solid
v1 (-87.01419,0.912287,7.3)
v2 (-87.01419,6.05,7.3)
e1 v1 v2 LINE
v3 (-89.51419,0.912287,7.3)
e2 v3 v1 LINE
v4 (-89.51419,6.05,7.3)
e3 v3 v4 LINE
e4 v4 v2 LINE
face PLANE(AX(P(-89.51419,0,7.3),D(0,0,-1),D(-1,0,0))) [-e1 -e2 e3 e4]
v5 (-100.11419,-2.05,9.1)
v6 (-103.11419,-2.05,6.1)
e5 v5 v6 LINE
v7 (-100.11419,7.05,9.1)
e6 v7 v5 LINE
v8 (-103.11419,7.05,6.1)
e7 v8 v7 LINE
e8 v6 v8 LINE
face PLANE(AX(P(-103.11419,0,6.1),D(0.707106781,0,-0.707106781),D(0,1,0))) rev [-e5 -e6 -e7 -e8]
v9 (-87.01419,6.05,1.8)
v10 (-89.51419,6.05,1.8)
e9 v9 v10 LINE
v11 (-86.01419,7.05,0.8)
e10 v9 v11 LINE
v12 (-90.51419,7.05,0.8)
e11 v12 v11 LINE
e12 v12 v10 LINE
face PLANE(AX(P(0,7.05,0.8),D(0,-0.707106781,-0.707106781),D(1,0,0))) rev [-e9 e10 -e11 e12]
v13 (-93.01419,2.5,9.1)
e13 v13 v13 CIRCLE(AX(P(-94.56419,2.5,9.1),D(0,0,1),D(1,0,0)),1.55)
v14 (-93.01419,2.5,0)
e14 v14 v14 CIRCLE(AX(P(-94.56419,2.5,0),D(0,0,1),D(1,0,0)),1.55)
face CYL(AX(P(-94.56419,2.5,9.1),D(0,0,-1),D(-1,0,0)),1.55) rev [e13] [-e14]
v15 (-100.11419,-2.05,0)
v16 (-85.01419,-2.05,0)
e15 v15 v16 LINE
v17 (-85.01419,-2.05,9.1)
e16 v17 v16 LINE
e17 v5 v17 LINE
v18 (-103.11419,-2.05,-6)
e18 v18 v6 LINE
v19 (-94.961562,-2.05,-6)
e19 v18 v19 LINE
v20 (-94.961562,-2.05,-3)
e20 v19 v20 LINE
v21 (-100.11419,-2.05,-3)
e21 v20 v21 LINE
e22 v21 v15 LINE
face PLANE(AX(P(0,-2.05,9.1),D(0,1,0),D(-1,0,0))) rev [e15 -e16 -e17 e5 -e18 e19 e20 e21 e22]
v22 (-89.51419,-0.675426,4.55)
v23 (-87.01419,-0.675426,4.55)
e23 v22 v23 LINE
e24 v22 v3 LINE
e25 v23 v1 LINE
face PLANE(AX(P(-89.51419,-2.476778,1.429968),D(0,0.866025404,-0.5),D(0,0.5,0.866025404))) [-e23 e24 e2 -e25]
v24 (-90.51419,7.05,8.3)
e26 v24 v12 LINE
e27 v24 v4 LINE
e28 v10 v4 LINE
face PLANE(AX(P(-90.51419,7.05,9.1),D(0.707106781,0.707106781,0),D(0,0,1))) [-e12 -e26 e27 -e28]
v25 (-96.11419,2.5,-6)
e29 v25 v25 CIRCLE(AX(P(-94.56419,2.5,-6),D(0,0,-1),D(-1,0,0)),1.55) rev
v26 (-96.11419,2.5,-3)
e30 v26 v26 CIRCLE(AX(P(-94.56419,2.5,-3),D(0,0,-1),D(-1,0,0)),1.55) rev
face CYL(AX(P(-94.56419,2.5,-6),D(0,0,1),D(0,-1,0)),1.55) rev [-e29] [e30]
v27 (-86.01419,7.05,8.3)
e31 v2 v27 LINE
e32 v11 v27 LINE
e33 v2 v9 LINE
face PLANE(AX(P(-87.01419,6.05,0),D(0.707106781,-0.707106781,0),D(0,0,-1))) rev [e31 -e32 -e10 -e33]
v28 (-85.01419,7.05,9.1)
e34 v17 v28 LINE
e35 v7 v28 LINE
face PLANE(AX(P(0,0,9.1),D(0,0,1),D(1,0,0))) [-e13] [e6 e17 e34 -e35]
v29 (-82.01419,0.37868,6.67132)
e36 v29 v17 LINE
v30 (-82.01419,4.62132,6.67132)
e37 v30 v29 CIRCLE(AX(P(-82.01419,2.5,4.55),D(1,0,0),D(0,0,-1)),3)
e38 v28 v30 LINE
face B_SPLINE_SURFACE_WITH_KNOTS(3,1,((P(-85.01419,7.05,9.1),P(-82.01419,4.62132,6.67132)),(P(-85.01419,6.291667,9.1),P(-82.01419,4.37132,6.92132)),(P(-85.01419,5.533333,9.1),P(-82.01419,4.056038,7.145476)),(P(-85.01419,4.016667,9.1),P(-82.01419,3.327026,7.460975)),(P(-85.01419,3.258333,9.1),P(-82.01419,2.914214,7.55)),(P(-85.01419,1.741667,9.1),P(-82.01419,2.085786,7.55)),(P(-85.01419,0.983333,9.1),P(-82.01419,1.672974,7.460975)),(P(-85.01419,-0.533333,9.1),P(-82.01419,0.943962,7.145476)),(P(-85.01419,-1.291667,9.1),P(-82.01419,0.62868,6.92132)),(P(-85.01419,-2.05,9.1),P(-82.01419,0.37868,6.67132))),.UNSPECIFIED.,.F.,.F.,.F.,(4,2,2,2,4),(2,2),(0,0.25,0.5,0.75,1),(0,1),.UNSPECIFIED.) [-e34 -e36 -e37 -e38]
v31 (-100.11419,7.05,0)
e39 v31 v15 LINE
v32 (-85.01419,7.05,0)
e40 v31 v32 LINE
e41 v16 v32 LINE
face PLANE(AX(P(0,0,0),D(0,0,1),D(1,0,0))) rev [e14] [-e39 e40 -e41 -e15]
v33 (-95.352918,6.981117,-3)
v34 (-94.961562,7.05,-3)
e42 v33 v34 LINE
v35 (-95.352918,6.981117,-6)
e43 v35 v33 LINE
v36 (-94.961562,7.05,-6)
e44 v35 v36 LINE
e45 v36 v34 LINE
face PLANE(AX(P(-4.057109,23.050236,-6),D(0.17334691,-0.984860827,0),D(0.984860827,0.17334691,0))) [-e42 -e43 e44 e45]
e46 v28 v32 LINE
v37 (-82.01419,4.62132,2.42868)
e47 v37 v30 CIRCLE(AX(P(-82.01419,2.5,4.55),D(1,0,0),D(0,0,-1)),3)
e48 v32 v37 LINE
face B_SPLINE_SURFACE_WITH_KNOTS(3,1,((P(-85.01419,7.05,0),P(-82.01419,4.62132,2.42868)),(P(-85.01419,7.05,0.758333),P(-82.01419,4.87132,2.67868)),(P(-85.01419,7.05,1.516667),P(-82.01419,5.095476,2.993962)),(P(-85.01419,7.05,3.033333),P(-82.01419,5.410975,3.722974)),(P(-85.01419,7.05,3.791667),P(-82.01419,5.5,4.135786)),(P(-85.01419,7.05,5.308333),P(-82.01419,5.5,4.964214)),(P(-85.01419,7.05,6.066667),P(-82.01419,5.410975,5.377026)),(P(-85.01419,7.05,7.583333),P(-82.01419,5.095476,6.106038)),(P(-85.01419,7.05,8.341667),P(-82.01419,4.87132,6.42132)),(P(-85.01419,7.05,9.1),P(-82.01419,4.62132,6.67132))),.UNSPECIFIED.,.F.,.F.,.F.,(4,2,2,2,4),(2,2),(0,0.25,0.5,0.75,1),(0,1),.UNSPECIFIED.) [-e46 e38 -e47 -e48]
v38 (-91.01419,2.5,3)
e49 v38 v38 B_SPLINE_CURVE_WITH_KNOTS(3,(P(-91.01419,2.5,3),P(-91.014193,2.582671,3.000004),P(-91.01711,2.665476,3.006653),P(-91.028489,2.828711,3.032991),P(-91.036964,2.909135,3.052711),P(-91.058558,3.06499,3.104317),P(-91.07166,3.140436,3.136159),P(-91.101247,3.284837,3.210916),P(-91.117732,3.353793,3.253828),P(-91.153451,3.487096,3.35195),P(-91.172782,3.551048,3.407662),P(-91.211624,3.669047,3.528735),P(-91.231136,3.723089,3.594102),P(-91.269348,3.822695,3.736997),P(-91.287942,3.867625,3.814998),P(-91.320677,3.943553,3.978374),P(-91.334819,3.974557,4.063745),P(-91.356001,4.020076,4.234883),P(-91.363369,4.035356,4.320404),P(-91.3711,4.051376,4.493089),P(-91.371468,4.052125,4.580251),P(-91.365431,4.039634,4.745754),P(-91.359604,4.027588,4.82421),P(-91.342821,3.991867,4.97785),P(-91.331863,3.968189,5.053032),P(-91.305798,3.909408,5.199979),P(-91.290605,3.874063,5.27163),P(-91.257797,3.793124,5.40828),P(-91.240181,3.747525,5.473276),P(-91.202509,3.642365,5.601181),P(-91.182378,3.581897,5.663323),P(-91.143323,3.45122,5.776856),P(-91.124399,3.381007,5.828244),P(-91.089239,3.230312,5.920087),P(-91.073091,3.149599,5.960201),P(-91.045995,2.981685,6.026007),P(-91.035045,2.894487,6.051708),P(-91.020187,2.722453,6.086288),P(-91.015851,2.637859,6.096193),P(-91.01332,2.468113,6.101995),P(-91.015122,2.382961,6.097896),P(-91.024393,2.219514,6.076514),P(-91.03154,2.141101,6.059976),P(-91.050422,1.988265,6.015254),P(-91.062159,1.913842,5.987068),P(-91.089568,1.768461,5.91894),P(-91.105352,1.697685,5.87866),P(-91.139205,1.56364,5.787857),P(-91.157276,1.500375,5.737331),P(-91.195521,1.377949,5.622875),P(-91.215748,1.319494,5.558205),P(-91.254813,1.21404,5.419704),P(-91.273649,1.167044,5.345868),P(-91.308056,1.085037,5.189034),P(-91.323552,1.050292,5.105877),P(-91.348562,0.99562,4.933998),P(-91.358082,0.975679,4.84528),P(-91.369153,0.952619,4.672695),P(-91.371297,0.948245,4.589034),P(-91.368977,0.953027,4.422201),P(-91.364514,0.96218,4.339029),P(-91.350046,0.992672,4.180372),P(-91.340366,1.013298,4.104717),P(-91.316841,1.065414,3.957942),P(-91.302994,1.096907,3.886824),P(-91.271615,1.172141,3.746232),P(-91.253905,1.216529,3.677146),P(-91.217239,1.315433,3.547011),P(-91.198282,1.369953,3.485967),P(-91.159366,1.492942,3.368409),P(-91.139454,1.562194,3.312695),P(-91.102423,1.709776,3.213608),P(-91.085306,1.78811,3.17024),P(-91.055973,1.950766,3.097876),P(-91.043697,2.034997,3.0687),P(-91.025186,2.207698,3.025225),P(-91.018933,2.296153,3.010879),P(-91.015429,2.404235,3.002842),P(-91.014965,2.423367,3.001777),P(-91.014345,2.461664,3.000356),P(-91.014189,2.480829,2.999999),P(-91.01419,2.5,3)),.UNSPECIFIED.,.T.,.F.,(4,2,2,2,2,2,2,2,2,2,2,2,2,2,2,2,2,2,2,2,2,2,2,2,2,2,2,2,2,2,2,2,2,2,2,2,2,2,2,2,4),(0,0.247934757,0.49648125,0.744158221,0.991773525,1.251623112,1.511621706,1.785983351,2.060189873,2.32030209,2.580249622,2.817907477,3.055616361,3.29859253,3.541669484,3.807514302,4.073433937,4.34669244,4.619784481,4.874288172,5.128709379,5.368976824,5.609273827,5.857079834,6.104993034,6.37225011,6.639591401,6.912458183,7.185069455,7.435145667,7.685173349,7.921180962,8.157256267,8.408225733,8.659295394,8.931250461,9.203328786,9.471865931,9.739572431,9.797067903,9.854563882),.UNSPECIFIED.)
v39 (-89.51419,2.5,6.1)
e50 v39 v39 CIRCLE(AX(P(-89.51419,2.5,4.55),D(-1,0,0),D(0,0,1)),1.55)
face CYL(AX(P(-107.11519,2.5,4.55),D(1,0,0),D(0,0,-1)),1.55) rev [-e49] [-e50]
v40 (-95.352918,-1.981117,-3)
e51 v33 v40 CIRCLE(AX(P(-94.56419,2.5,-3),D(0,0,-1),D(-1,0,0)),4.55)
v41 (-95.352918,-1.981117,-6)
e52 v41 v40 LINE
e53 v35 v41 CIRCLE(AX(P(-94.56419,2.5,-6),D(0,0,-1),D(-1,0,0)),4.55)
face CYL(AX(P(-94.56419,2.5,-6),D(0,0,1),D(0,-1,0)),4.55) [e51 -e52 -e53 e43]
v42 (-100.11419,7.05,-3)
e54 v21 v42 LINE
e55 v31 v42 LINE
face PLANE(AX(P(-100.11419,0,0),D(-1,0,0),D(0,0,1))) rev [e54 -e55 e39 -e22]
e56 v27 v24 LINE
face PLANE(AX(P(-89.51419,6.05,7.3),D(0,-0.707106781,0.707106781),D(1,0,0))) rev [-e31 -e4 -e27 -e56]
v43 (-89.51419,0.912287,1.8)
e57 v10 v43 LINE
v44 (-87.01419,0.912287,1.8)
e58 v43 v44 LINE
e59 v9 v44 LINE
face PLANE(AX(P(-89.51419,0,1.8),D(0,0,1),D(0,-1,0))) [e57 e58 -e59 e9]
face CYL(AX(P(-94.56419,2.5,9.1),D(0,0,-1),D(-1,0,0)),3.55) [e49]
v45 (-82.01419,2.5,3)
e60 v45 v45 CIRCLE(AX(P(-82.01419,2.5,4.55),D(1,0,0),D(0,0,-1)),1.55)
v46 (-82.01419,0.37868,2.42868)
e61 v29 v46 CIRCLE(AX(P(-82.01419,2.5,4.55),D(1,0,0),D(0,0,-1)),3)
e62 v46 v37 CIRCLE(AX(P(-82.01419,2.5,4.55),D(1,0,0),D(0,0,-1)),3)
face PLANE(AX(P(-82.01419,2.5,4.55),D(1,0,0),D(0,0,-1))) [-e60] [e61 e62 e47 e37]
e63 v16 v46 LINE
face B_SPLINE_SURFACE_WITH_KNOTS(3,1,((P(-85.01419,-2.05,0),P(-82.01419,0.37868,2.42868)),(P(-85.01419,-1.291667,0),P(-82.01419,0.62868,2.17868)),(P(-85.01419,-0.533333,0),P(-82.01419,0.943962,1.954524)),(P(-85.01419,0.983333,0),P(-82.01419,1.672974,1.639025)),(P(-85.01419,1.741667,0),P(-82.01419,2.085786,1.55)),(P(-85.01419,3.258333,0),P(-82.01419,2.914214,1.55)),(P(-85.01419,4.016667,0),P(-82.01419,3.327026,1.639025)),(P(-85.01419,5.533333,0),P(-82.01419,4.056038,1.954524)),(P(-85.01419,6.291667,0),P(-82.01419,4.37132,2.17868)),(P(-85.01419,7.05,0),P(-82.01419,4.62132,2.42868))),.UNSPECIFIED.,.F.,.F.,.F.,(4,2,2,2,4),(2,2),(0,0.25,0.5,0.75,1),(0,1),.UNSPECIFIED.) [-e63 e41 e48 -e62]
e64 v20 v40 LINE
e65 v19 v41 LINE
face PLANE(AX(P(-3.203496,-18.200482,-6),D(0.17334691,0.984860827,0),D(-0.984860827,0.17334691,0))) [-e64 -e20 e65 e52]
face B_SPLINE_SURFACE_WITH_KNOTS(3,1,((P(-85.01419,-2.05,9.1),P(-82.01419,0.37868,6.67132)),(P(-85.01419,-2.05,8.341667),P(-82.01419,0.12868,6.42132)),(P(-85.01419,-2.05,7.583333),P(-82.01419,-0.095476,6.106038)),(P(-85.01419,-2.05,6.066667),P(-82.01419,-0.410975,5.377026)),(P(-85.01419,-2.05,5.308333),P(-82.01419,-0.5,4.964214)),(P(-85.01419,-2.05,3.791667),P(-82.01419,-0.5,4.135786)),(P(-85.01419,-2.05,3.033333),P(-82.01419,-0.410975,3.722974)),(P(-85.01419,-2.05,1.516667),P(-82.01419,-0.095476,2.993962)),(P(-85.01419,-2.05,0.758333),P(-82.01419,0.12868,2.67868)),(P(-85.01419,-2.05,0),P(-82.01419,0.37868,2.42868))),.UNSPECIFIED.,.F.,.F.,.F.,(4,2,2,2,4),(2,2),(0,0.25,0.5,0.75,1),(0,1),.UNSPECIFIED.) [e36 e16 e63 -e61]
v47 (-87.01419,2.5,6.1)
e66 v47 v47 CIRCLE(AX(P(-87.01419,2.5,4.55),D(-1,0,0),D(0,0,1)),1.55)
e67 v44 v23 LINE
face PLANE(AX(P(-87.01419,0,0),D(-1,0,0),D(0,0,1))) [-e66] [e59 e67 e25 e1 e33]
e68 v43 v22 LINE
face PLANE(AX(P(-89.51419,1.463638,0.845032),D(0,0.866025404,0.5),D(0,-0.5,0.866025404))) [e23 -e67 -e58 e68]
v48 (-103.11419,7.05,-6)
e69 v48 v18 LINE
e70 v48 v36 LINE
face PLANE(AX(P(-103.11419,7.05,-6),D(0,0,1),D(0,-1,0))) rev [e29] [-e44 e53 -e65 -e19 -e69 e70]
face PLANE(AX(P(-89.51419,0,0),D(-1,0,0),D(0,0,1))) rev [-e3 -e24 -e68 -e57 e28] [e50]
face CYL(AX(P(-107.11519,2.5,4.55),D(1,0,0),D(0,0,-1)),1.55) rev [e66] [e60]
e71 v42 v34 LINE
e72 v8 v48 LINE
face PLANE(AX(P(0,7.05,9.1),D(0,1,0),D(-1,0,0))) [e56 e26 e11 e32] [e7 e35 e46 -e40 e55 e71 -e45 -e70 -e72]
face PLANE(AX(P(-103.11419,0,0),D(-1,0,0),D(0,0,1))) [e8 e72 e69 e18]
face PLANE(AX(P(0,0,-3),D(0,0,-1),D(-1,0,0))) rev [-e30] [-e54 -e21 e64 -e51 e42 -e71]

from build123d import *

# Parameters (mm, degrees)
SKETCH1_R               = 4.55
SKETCH1_R_2             = 1.55
BOSS_EXTRUDE1_DEPTH     = 9.1
SKETCH2_R               = 1.55
BOSS_EXTRUDE2_DEPTH     = 3
SKETCH3_W               = 15.1
SKETCH3_H               = 9.1
BOSS_EXTRUDE3_DEPTH     = 3
CUT_EXTRUDE1_REACH      = 26.036
CUT_EXTRUDE1_END_RADIUS = 3.55
SKETCH4_R               = 1.55
SKETCH5_R               = 1.55
CUT_EXTRUDE2_DEPTH      = 2.5
CHAMFER1_SIZE           = 1
CHAMFER2_SIZE           = 3


with BuildPart() as part:
    # Sketch1 → Boss-Extrude1 (new body)
    # profile 1 of 3: a face of its own
    with BuildSketch(Plane.XY):
        with Locations((-94.564189657, 2.5)):
            Circle(SKETCH1_R)
        with Locations((-94.564189657, 2.5)):
            Circle(SKETCH1_R_2, mode=Mode.SUBTRACT)
    # profile 2 of 3: a face of its own
    with BuildSketch(Plane.XY):
        with BuildLine():
            ThreePointArc((-94.564189657, -2.05), (-99.114189657, 2.5), (-94.564189657, 7.05))
            Line((-94.564189657, 7.05), (-100.114189657, 7.05))
            Line((-100.114189657, 7.05), (-100.114189657, -2.05))
            Line((-100.114189657, -2.05), (-94.564189657, -2.05))
        make_face()
    # profile 3 of 3: a face of its own
    with BuildSketch(Plane.XY):
        with BuildLine():
            Line((-85.014189657, 7.05), (-94.564189657, 7.05))
            ThreePointArc((-94.564189657, 7.05), (-91.346853802, 5.717335854), (-90.014189657, 2.5))
            ThreePointArc((-90.014189657, 2.5), (-91.346853802, -0.717335854), (-94.564189657, -2.05))
            Line((-94.564189657, -2.05), (-85.014189657, -2.05))
            Line((-85.014189657, -2.05), (-85.014189657, 7.05))
        make_face()
    extrude(amount=BOSS_EXTRUDE1_DEPTH)



with BuildPart() as body_2:
    # Sketch2 → Boss-Extrude2 (new body)
    # profile 1 of 2: a face of its own
    with BuildSketch(Plane(origin=(0, 0, -3), x_dir=(-1, 0, 0), z_dir=(0, 0, -1))):
        with BuildLine():
            ThreePointArc((95.352918097, 6.981116764), (94.960054991, 7.032746478), (94.564189657, 7.05))
            ThreePointArc((94.564189657, 7.05), (90.014189657, 2.5), (94.564189657, -2.05))
            ThreePointArc((94.564189657, -2.05), (94.960054991, -2.032746478), (95.352918097, -1.981116763))
            ThreePointArc((95.352918097, -1.981116763), (98.049244492, -0.42521671), (99.114189657, 2.5))
            ThreePointArc((99.114189657, 2.5), (98.049244492, 5.42521671), (95.352918097, 6.981116764))
        make_face()
        with Locations(Location((94.564189657, 2.5, 0), (0, 0, 180))):
            Circle(SKETCH2_R, mode=Mode.SUBTRACT)
    # profile 2 of 2: a face of its own
    with BuildSketch(Plane(origin=(0, 0, -3), x_dir=(-1, 0, 0), z_dir=(0, 0, -1))):
        with BuildLine():
            Line((100.114189657, -2.05), (100.114189657, 7.05))
            Line((100.114189657, 7.05), (94.96156182, 7.05))
            Line((94.96156182, 7.05), (95.352918097, 6.981116764))
            ThreePointArc((95.352918097, 6.981116764), (98.049244492, 5.42521671), (99.114189657, 2.5))
            ThreePointArc((99.114189657, 2.5), (98.049244492, -0.42521671), (95.352918097, -1.981116763))
            Line((95.352918097, -1.981116763), (94.96156182, -2.05))
            Line((94.96156182, -2.05), (100.114189657, -2.05))
        make_face()
    extrude(amount=BOSS_EXTRUDE2_DEPTH)


with BuildPart() as part_1:
    add(part.part)

    add(body_2.part)  # Boss-Extrude3 merges body 2
    # Sketch3 → Boss-Extrude3 (add)
    with BuildSketch(Plane.ZY.offset(100.114189657)):
        with Locations((1.55, 2.5)):
            Rectangle(SKETCH3_W, SKETCH3_H)
    extrude(amount=BOSS_EXTRUDE3_DEPTH)

    # Loft1: read off the stored shape, not the designer's step
    # Loft1: loft between two sections, ruled curve by curve
    loft1_from = [
        Edge.make_bspline([(-85.014189657, -2.05, 9.1), (-85.014189657, -2.05, 8.341666667), (-85.014189657, -2.05, 7.583333333), (-85.014189657, -2.05, 6.066666667), (-85.014189657, -2.05, 5.308333333), (-85.014189657, -2.05, 3.791666667), (-85.014189657, -2.05, 3.033333333), (-85.014189657, -2.05, 1.516666667), (-85.014189657, -2.05, 0.758333333), (-85.014189657, -2.05, 0)], [0, 0, 0, 0, 0.25, 0.25, 0.5, 0.5, 0.75, 0.75, 1, 1, 1, 1], 3),
        Edge.make_bspline([(-85.014189657, -2.05, 0), (-85.014189657, -1.291666667, 0), (-85.014189657, -0.533333333, 0), (-85.014189657, 0.983333333, 0), (-85.014189657, 1.741666667, 0), (-85.014189657, 3.258333333, 0), (-85.014189657, 4.016666667, 0), (-85.014189657, 5.533333333, 0), (-85.014189657, 6.291666667, 0), (-85.014189657, 7.05, 0)], [0, 0, 0, 0, 0.25, 0.25, 0.5, 0.5, 0.75, 0.75, 1, 1, 1, 1], 3),
        Edge.make_bspline([(-85.014189657, 7.05, 9.1), (-85.014189657, 6.291666667, 9.1), (-85.014189657, 5.533333333, 9.1), (-85.014189657, 4.016666667, 9.1), (-85.014189657, 3.258333333, 9.1), (-85.014189657, 1.741666667, 9.1), (-85.014189657, 0.983333333, 9.1), (-85.014189657, -0.533333333, 9.1), (-85.014189657, -1.291666667, 9.1), (-85.014189657, -2.05, 9.1)], [0, 0, 0, 0, 0.25, 0.25, 0.5, 0.5, 0.75, 0.75, 1, 1, 1, 1], 3),
        Edge.make_bspline([(-85.014189657, 7.05, 0), (-85.014189657, 7.05, 0.758333333), (-85.014189657, 7.05, 1.516666667), (-85.014189657, 7.05, 3.033333333), (-85.014189657, 7.05, 3.791666667), (-85.014189657, 7.05, 5.308333333), (-85.014189657, 7.05, 6.066666667), (-85.014189657, 7.05, 7.583333333), (-85.014189657, 7.05, 8.341666667), (-85.014189657, 7.05, 9.1)], [0, 0, 0, 0, 0.25, 0.25, 0.5, 0.5, 0.75, 0.75, 1, 1, 1, 1], 3),
    ]
    loft1_to = [
        Edge.make_bspline([(-82.014189657, 0.378679656, 6.671320344), (-82.014189657, 0.128679656, 6.421320344), (-82.014189657, -0.095475789, 6.106038327), (-82.014189657, -0.410975479, 5.377025758), (-82.014189657, -0.5, 4.964213562), (-82.014189657, -0.5, 4.135786438), (-82.014189657, -0.410975479, 3.722974242), (-82.014189657, -0.095475789, 2.993961673), (-82.014189657, 0.128679656, 2.678679656), (-82.014189657, 0.378679656, 2.428679656)], [0, 0, 0, 0, 0.25, 0.25, 0.5, 0.5, 0.75, 0.75, 1, 1, 1, 1], 3),
        Edge.make_bspline([(-82.014189657, 0.378679656, 2.428679656), (-82.014189657, 0.628679656, 2.178679656), (-82.014189657, 0.943961673, 1.954524211), (-82.014189657, 1.672974242, 1.639024521), (-82.014189657, 2.085786438, 1.55), (-82.014189657, 2.914213562, 1.55), (-82.014189657, 3.327025758, 1.639024521), (-82.014189657, 4.056038327, 1.954524211), (-82.014189657, 4.371320344, 2.178679656), (-82.014189657, 4.621320344, 2.428679656)], [0, 0, 0, 0, 0.25, 0.25, 0.5, 0.5, 0.75, 0.75, 1, 1, 1, 1], 3),
        Edge.make_bspline([(-82.014189657, 4.621320344, 6.671320344), (-82.014189657, 4.371320344, 6.921320344), (-82.014189657, 4.056038327, 7.145475789), (-82.014189657, 3.327025758, 7.460975479), (-82.014189657, 2.914213562, 7.55), (-82.014189657, 2.085786438, 7.55), (-82.014189657, 1.672974242, 7.460975479), (-82.014189657, 0.943961673, 7.145475789), (-82.014189657, 0.628679656, 6.921320344), (-82.014189657, 0.378679656, 6.671320344)], [0, 0, 0, 0, 0.25, 0.25, 0.5, 0.5, 0.75, 0.75, 1, 1, 1, 1], 3),
        Edge.make_bspline([(-82.014189657, 4.621320344, 2.428679656), (-82.014189657, 4.871320344, 2.678679656), (-82.014189657, 5.095475789, 2.993961673), (-82.014189657, 5.410975479, 3.722974242), (-82.014189657, 5.5, 4.135786438), (-82.014189657, 5.5, 4.964213562), (-82.014189657, 5.410975479, 5.377025758), (-82.014189657, 5.095475789, 6.106038327), (-82.014189657, 4.871320344, 6.421320344), (-82.014189657, 4.621320344, 6.671320344)], [0, 0, 0, 0, 0.25, 0.25, 0.5, 0.5, 0.75, 0.75, 1, 1, 1, 1], 3),
    ]
    loft1 = Solid(Shell([*[Face.make_surface_from_curves(loft1_from[k], loft1_to[k]) for k in range(4)], Face(Wire(loft1_from)), Face(Wire(loft1_to))]))
    add(loft1)

    # Cut-Extrude1: up to this cylinder (the profile starts outside it)
    cut_extrude1_end = Plane(origin=(-94.564189657, 2.5, 4.55), z_dir=(0, 0, -1)) * Cylinder(CUT_EXTRUDE1_END_RADIUS, 60.172, mode=Mode.PRIVATE)
    # Sketch4 → Cut-Extrude1 (cut, up to the surface)
    with BuildSketch(Plane(origin=(-82.014189657, 0, 0), x_dir=(0, 0, -1), z_dir=(1, 0, 0)), mode=Mode.PRIVATE) as cut_extrude1_sk1:
        with Locations((-4.55, 2.5)):
            Circle(SKETCH4_R)
    cut_extrude1_tool1 = extrude(cut_extrude1_sk1.sketch, amount=-CUT_EXTRUDE1_REACH, mode=Mode.PRIVATE) - cut_extrude1_end
    add(cut_extrude1_tool1.solids().sort_by_distance((-82.01419, 2.5, 4.55))[0], mode=Mode.SUBTRACT)

    # Sketch5 → Cut-Extrude2 (cut)
    # profile 1 of 2: a face of its own
    with BuildSketch(Plane.ZY.offset(87.014189657)):
        Polygon((4.55, 5.675426481), (7.3, 4.08771324), (7.3, 7.05), (1.8, 7.05), (1.8, 4.08771324), align=None)
    # profile 2 of 2: a face of its own
    with BuildSketch(Plane.ZY.offset(87.014189657)):
        Polygon((7.3, 0.91228676), (7.3, 4.08771324), (4.55, 5.675426481), (1.8, 4.08771324), (1.8, 0.91228676), (4.55, -0.675426481), align=None)
        with Locations(Location((4.55, 2.5, 0), (0, 0, 180))):
            Circle(SKETCH5_R, mode=Mode.SUBTRACT)
    extrude(amount=CUT_EXTRUDE2_DEPTH, mode=Mode.SUBTRACT)

    # Chamfer1
    chamfer1_edges = [part_1.edges().sort_by_distance(p)[0] for p in [
        (-87.014189657, 7.05, 4.55),
        (-88.264189657, 7.05, 7.3),
        (-88.264189657, 7.05, 1.8),
        (-89.514189657, 7.05, 4.55),
    ]]
    chamfer(chamfer1_edges, length=CHAMFER1_SIZE)

    # Chamfer2
    chamfer2_edges = [part_1.edges().sort_by_distance(p)[0] for p in [
        (-103.114189657, 2.5, 9.1),
    ]]
    chamfer(chamfer2_edges, length=CHAMFER2_SIZE)


solid = part_1.part
